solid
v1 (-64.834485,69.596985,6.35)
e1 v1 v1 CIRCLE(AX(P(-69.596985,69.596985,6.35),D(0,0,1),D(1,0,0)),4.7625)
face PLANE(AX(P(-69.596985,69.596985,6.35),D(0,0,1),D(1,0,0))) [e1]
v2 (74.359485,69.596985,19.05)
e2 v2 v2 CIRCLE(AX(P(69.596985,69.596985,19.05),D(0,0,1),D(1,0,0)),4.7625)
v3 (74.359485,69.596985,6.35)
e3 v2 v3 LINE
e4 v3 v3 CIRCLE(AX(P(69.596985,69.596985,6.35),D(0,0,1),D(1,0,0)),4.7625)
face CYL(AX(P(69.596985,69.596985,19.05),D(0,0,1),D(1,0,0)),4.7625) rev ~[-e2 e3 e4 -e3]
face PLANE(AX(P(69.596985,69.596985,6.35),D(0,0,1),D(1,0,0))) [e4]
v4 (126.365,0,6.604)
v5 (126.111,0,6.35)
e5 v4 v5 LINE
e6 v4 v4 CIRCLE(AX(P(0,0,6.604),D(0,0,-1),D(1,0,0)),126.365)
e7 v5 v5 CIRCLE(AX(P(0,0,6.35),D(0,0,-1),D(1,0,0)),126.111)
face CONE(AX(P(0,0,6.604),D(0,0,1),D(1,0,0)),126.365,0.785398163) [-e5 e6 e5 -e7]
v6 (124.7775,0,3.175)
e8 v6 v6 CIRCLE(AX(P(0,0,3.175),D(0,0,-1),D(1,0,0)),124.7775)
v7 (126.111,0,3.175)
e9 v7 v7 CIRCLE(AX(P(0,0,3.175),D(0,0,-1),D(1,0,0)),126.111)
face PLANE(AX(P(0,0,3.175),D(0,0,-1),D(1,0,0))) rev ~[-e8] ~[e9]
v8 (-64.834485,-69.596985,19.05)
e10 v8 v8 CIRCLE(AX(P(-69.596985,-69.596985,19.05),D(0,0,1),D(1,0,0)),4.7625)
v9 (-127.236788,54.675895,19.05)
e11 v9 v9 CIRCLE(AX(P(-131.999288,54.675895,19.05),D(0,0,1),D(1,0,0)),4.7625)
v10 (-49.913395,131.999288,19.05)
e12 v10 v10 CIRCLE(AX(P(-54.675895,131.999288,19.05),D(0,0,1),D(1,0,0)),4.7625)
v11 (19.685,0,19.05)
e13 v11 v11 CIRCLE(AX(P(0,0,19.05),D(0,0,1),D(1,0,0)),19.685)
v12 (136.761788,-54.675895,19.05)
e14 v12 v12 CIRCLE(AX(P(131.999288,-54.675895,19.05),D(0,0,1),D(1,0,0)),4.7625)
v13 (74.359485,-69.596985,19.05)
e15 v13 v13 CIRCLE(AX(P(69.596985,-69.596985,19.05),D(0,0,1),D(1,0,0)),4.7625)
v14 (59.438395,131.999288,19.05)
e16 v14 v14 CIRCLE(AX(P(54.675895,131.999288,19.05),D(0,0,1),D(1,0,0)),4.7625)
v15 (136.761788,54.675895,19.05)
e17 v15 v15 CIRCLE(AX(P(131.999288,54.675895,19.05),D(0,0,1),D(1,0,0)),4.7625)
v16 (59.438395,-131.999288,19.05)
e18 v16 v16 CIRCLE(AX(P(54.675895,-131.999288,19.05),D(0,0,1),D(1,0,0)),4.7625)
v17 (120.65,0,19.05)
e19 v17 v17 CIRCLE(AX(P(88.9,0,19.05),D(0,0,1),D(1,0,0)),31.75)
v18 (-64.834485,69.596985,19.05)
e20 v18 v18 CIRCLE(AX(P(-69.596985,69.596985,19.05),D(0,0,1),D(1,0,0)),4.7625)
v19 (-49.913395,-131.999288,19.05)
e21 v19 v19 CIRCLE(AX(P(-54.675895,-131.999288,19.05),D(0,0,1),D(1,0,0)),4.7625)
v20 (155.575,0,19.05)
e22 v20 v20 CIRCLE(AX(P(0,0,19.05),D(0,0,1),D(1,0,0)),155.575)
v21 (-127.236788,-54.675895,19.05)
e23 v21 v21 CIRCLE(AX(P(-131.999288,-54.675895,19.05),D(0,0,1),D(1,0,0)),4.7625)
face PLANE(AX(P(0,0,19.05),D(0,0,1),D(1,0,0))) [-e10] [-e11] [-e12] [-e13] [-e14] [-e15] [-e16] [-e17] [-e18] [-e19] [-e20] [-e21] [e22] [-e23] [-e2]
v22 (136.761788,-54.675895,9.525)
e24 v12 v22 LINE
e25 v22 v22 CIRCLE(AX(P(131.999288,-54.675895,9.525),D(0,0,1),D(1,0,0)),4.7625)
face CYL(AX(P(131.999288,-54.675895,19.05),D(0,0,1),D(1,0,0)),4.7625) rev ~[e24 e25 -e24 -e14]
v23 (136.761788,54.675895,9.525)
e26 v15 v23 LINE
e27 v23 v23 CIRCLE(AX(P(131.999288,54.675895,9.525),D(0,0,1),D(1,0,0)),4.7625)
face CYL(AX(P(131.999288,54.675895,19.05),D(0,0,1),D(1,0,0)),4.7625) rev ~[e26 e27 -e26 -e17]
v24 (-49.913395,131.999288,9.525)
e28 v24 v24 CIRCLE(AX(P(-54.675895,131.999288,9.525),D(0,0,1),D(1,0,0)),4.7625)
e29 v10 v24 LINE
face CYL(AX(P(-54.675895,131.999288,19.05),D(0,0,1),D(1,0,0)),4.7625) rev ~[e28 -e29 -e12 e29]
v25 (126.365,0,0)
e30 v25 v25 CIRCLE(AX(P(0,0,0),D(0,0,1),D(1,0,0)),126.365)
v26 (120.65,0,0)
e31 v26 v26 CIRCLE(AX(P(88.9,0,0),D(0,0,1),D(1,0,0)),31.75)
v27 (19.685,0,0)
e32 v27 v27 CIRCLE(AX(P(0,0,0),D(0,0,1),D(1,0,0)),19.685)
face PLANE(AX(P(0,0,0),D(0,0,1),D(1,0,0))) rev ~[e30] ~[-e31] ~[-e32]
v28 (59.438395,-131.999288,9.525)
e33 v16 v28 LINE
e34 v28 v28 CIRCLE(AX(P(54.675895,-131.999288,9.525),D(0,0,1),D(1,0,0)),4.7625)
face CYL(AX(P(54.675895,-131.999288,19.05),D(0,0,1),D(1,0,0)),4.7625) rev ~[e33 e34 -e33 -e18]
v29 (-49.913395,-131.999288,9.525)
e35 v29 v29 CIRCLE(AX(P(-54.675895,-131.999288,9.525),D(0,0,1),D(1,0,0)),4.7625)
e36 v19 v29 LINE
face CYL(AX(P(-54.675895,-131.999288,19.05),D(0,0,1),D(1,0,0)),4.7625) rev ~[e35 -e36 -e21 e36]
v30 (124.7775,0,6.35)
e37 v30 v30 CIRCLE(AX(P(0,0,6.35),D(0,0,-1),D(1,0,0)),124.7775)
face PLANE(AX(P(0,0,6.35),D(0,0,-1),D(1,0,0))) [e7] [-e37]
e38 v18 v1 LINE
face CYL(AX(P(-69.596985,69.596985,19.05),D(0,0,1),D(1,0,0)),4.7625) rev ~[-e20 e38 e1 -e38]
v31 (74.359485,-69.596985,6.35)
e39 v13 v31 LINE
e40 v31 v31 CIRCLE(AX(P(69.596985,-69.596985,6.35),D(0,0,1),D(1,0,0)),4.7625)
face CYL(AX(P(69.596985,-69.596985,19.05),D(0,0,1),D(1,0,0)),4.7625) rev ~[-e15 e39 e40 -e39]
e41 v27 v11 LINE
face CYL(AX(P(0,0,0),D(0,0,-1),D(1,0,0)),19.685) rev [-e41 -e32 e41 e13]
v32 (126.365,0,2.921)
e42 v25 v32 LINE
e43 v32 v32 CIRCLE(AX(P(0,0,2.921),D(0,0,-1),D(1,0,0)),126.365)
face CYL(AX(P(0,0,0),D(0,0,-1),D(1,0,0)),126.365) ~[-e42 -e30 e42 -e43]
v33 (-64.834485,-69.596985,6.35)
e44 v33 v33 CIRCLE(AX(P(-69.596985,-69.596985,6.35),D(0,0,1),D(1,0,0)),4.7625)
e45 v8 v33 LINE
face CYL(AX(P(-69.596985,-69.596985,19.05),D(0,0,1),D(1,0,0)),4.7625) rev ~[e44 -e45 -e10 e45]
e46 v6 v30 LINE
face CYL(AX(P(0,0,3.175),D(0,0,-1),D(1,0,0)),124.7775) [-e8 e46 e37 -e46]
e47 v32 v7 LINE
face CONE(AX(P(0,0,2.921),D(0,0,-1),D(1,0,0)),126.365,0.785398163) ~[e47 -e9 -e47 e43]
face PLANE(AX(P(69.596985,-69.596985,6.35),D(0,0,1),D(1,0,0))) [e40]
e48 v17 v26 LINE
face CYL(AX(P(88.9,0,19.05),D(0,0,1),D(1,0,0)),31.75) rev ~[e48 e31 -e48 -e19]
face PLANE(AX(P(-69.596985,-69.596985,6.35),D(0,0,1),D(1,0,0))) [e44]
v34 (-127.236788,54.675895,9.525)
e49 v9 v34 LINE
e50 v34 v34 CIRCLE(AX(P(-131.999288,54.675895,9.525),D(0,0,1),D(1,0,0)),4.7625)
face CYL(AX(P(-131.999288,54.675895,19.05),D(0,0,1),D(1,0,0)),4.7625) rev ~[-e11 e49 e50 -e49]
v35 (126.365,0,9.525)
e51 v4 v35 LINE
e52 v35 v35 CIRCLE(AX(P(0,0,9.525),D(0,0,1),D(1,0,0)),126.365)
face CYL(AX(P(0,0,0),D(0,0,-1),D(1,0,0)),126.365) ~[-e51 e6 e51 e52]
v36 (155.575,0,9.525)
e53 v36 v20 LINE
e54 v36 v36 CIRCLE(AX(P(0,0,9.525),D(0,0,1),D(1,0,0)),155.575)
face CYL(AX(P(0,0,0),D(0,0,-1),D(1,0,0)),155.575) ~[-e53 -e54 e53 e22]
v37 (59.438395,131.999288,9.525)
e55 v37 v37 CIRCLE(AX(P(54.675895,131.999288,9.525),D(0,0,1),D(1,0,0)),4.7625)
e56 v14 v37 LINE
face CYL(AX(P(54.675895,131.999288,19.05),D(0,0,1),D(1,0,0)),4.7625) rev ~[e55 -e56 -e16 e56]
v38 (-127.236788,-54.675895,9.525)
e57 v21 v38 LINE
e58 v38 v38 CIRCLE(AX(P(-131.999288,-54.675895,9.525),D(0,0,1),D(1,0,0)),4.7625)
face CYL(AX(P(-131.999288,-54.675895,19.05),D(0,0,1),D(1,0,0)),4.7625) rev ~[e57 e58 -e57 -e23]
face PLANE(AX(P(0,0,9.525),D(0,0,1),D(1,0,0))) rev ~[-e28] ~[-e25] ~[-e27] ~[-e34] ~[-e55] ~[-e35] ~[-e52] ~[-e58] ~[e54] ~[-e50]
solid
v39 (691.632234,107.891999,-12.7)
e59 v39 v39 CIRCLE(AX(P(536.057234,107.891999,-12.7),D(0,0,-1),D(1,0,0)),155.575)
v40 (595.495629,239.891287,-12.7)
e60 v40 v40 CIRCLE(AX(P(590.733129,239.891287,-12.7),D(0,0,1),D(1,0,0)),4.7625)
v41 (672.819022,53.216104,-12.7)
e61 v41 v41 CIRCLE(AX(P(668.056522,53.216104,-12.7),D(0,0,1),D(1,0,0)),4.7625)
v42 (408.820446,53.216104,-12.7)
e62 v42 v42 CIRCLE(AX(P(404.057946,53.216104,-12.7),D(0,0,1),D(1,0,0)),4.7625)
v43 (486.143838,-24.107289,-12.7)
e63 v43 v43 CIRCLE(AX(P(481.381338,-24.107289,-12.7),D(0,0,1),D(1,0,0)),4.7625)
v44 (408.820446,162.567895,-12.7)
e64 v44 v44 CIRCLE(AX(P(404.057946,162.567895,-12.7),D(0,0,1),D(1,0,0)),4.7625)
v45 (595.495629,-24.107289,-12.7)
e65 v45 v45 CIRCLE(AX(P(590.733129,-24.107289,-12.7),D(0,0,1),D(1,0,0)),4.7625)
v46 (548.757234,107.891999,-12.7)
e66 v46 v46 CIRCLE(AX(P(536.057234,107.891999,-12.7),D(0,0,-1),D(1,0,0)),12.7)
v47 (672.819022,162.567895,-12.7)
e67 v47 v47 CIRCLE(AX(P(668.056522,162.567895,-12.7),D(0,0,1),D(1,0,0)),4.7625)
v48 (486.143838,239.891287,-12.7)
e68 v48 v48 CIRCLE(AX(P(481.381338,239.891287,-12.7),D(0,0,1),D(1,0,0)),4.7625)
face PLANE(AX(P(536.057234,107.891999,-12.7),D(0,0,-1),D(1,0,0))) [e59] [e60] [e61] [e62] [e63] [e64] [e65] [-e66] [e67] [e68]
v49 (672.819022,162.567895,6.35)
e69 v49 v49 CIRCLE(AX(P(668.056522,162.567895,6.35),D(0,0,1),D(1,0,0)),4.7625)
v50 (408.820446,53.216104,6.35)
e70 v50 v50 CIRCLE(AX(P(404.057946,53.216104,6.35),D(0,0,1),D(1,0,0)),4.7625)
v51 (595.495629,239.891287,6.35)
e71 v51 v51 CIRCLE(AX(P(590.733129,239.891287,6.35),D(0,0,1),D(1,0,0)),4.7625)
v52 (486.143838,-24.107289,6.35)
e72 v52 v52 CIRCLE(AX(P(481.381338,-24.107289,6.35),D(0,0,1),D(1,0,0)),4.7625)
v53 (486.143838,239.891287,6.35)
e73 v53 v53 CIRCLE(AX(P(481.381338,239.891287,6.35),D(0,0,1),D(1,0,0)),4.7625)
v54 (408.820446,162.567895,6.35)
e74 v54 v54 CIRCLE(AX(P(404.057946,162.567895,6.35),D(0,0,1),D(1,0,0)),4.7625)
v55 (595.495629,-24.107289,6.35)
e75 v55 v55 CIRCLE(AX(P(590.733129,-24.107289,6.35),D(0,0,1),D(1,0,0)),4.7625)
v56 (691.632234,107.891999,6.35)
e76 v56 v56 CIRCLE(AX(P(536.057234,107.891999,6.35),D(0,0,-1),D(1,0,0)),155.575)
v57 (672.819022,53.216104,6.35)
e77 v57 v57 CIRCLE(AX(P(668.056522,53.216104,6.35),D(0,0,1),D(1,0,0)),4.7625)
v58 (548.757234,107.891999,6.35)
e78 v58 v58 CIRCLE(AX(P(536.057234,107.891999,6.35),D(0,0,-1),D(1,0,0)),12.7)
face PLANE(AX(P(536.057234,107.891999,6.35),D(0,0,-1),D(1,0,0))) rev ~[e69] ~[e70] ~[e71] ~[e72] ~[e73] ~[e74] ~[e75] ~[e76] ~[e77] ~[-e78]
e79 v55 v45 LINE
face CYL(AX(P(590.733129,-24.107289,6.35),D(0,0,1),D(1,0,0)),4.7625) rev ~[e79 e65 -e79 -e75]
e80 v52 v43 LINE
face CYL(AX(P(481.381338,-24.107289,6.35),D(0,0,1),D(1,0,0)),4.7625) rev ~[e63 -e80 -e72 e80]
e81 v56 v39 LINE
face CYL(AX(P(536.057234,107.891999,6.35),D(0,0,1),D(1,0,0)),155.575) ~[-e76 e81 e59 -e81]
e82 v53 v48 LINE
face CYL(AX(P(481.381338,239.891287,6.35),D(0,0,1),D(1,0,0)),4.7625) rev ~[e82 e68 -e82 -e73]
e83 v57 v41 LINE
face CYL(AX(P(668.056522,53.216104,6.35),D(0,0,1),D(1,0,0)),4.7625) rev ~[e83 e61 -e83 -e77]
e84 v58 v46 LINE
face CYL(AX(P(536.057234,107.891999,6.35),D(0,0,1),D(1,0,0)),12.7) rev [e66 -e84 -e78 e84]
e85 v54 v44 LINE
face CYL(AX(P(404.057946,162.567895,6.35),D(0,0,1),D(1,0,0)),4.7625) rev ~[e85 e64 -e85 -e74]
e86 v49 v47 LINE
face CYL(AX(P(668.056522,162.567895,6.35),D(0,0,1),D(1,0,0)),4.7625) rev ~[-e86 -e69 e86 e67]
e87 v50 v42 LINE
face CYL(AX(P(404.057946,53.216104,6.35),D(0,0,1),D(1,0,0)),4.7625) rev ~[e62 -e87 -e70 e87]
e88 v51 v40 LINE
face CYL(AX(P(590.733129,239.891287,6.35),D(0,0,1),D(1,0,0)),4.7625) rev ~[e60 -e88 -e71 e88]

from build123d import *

# Parameters (mm, degrees)
F0_R      = 155.575
F0_R_2    = 126.365
F0_R_3    = 19.685
F1_DEPTH  = 19.05
F2_DEPTH  = 9.525
F3_R      = 4.7625
F4_DEPTH  = 25.4
F8_R      = 155.575
F8_R_2    = 12.7
F9_DEPTH  = 19.05
F10_R     = 4.7625
F11_DEPTH = 25.4
F12_R     = 31.75
F13_DEPTH = 50.8
F14_R     = 4.7625
F15_DEPTH = 12.7
F17_R     = 127
F17_R_2   = 124.7775
F18_DEPTH = 3.175
F19_SIZE  = 0.254


with BuildPart() as f1:
    # F0 (on Top) → F1 (new body)
    with BuildSketch(Plane.XY):
        Circle(F0_R)
        Circle(F0_R_2, mode=Mode.SUBTRACT)
        Circle(F0_R_2)
        Circle(F0_R_3, mode=Mode.SUBTRACT)
    extrude(amount=F1_DEPTH)

    # F0 (on Top) → F2 (cut)
    with BuildSketch(Plane.XY):
        Circle(F0_R)
        Circle(F0_R_2, mode=Mode.SUBTRACT)
    extrude(amount=F2_DEPTH, mode=Mode.SUBTRACT)

    # F3 (on face) → F4 (cut)
    with BuildSketch(Plane.XY.offset(19.05)):
        with Locations((-54.6758953992, 131.9992882076)):
            Circle(F3_R)
        with Locations((-131.9992882076, 54.6758953992)):
            Circle(F3_R)
        with Locations((-131.9992882076, -54.6758953992)):
            Circle(F3_R)
        with Locations((-54.6758953992, -131.9992882076)):
            Circle(F3_R)
        with Locations((54.6758953992, -131.9992882076)):
            Circle(F3_R)
        with Locations((131.9992882076, -54.6758953992)):
            Circle(F3_R)
        with Locations((131.9992882076, 54.6758953992)):
            Circle(F3_R)
        with Locations((54.6758953992, 131.9992882076)):
            Circle(F3_R)
    extrude(amount=-F4_DEPTH, mode=Mode.SUBTRACT)

    # F12 (on face) → F13 (cut)
    with BuildSketch(Plane.XY.offset(19.05)):
        with Locations((88.9, 0)):
            Circle(F12_R)
    extrude(amount=-F13_DEPTH, mode=Mode.SUBTRACT)

    # F14 (on face) → F15 (cut)
    with BuildSketch(Plane.XY.offset(19.05)):
        with Locations((-69.5969849383, 69.5969849383)):
            Circle(F14_R)
        with Locations((-69.5969849383, -69.5969849383)):
            Circle(F14_R)
        with Locations((69.5969849383, -69.5969849383)):
            Circle(F14_R)
        with Locations((69.5969849383, 69.5969849383)):
            Circle(F14_R)
    extrude(amount=-F15_DEPTH, mode=Mode.SUBTRACT)

    # F17 (on offset) → F18 (cut)
    with BuildSketch(Plane(origin=(0, 0, 3.175), x_dir=(1, 0, 0), z_dir=(0, 0, -1))):
        Circle(F17_R)
        Circle(F17_R_2, mode=Mode.SUBTRACT)
    extrude(amount=-F18_DEPTH, mode=Mode.SUBTRACT)

    # F19
    f19_edges = [f1.edges().sort_by_distance(p)[0] for p in [
        (-126.365, 0, 6.35),
        (-126.365, 0, 3.175),
    ]]
    chamfer(f19_edges, length=F19_SIZE)


with BuildPart() as f9:
    # F8 (on offset) → F9 (new body)
    with BuildSketch(Plane(origin=(0, 0, 6.35), x_dir=(1, 0, 0), z_dir=(0, 0, -1))):
        with Locations((536.0572338104, -107.8919991851)):
            Circle(F8_R)
        with Locations((536.0572338104, -107.8919991851)):
            Circle(F8_R_2, mode=Mode.SUBTRACT)
    extrude(amount=F9_DEPTH)

    # F10 (on face) → F11 (cut)
    with BuildSketch(Plane.XY.offset(6.35)):
        with Locations((481.3813384113, 239.8912873926)):
            Circle(F10_R)
        with Locations((404.0579456029, 162.5678945842)):
            Circle(F10_R)
        with Locations((404.0579456029, 53.2161037859)):
            Circle(F10_R)
        with Locations((481.3813384113, -24.1072890225)):
            Circle(F10_R)
        with Locations((590.7331292096, -24.1072890225)):
            Circle(F10_R)
        with Locations((668.056522018, 53.2161037859)):
            Circle(F10_R)
        with Locations((668.056522018, 162.5678945842)):
            Circle(F10_R)
        with Locations((590.7331292096, 239.8912873926)):
            Circle(F10_R)
    extrude(amount=-F11_DEPTH, mode=Mode.SUBTRACT)


solid = Compound([f1.part, f9.part])
